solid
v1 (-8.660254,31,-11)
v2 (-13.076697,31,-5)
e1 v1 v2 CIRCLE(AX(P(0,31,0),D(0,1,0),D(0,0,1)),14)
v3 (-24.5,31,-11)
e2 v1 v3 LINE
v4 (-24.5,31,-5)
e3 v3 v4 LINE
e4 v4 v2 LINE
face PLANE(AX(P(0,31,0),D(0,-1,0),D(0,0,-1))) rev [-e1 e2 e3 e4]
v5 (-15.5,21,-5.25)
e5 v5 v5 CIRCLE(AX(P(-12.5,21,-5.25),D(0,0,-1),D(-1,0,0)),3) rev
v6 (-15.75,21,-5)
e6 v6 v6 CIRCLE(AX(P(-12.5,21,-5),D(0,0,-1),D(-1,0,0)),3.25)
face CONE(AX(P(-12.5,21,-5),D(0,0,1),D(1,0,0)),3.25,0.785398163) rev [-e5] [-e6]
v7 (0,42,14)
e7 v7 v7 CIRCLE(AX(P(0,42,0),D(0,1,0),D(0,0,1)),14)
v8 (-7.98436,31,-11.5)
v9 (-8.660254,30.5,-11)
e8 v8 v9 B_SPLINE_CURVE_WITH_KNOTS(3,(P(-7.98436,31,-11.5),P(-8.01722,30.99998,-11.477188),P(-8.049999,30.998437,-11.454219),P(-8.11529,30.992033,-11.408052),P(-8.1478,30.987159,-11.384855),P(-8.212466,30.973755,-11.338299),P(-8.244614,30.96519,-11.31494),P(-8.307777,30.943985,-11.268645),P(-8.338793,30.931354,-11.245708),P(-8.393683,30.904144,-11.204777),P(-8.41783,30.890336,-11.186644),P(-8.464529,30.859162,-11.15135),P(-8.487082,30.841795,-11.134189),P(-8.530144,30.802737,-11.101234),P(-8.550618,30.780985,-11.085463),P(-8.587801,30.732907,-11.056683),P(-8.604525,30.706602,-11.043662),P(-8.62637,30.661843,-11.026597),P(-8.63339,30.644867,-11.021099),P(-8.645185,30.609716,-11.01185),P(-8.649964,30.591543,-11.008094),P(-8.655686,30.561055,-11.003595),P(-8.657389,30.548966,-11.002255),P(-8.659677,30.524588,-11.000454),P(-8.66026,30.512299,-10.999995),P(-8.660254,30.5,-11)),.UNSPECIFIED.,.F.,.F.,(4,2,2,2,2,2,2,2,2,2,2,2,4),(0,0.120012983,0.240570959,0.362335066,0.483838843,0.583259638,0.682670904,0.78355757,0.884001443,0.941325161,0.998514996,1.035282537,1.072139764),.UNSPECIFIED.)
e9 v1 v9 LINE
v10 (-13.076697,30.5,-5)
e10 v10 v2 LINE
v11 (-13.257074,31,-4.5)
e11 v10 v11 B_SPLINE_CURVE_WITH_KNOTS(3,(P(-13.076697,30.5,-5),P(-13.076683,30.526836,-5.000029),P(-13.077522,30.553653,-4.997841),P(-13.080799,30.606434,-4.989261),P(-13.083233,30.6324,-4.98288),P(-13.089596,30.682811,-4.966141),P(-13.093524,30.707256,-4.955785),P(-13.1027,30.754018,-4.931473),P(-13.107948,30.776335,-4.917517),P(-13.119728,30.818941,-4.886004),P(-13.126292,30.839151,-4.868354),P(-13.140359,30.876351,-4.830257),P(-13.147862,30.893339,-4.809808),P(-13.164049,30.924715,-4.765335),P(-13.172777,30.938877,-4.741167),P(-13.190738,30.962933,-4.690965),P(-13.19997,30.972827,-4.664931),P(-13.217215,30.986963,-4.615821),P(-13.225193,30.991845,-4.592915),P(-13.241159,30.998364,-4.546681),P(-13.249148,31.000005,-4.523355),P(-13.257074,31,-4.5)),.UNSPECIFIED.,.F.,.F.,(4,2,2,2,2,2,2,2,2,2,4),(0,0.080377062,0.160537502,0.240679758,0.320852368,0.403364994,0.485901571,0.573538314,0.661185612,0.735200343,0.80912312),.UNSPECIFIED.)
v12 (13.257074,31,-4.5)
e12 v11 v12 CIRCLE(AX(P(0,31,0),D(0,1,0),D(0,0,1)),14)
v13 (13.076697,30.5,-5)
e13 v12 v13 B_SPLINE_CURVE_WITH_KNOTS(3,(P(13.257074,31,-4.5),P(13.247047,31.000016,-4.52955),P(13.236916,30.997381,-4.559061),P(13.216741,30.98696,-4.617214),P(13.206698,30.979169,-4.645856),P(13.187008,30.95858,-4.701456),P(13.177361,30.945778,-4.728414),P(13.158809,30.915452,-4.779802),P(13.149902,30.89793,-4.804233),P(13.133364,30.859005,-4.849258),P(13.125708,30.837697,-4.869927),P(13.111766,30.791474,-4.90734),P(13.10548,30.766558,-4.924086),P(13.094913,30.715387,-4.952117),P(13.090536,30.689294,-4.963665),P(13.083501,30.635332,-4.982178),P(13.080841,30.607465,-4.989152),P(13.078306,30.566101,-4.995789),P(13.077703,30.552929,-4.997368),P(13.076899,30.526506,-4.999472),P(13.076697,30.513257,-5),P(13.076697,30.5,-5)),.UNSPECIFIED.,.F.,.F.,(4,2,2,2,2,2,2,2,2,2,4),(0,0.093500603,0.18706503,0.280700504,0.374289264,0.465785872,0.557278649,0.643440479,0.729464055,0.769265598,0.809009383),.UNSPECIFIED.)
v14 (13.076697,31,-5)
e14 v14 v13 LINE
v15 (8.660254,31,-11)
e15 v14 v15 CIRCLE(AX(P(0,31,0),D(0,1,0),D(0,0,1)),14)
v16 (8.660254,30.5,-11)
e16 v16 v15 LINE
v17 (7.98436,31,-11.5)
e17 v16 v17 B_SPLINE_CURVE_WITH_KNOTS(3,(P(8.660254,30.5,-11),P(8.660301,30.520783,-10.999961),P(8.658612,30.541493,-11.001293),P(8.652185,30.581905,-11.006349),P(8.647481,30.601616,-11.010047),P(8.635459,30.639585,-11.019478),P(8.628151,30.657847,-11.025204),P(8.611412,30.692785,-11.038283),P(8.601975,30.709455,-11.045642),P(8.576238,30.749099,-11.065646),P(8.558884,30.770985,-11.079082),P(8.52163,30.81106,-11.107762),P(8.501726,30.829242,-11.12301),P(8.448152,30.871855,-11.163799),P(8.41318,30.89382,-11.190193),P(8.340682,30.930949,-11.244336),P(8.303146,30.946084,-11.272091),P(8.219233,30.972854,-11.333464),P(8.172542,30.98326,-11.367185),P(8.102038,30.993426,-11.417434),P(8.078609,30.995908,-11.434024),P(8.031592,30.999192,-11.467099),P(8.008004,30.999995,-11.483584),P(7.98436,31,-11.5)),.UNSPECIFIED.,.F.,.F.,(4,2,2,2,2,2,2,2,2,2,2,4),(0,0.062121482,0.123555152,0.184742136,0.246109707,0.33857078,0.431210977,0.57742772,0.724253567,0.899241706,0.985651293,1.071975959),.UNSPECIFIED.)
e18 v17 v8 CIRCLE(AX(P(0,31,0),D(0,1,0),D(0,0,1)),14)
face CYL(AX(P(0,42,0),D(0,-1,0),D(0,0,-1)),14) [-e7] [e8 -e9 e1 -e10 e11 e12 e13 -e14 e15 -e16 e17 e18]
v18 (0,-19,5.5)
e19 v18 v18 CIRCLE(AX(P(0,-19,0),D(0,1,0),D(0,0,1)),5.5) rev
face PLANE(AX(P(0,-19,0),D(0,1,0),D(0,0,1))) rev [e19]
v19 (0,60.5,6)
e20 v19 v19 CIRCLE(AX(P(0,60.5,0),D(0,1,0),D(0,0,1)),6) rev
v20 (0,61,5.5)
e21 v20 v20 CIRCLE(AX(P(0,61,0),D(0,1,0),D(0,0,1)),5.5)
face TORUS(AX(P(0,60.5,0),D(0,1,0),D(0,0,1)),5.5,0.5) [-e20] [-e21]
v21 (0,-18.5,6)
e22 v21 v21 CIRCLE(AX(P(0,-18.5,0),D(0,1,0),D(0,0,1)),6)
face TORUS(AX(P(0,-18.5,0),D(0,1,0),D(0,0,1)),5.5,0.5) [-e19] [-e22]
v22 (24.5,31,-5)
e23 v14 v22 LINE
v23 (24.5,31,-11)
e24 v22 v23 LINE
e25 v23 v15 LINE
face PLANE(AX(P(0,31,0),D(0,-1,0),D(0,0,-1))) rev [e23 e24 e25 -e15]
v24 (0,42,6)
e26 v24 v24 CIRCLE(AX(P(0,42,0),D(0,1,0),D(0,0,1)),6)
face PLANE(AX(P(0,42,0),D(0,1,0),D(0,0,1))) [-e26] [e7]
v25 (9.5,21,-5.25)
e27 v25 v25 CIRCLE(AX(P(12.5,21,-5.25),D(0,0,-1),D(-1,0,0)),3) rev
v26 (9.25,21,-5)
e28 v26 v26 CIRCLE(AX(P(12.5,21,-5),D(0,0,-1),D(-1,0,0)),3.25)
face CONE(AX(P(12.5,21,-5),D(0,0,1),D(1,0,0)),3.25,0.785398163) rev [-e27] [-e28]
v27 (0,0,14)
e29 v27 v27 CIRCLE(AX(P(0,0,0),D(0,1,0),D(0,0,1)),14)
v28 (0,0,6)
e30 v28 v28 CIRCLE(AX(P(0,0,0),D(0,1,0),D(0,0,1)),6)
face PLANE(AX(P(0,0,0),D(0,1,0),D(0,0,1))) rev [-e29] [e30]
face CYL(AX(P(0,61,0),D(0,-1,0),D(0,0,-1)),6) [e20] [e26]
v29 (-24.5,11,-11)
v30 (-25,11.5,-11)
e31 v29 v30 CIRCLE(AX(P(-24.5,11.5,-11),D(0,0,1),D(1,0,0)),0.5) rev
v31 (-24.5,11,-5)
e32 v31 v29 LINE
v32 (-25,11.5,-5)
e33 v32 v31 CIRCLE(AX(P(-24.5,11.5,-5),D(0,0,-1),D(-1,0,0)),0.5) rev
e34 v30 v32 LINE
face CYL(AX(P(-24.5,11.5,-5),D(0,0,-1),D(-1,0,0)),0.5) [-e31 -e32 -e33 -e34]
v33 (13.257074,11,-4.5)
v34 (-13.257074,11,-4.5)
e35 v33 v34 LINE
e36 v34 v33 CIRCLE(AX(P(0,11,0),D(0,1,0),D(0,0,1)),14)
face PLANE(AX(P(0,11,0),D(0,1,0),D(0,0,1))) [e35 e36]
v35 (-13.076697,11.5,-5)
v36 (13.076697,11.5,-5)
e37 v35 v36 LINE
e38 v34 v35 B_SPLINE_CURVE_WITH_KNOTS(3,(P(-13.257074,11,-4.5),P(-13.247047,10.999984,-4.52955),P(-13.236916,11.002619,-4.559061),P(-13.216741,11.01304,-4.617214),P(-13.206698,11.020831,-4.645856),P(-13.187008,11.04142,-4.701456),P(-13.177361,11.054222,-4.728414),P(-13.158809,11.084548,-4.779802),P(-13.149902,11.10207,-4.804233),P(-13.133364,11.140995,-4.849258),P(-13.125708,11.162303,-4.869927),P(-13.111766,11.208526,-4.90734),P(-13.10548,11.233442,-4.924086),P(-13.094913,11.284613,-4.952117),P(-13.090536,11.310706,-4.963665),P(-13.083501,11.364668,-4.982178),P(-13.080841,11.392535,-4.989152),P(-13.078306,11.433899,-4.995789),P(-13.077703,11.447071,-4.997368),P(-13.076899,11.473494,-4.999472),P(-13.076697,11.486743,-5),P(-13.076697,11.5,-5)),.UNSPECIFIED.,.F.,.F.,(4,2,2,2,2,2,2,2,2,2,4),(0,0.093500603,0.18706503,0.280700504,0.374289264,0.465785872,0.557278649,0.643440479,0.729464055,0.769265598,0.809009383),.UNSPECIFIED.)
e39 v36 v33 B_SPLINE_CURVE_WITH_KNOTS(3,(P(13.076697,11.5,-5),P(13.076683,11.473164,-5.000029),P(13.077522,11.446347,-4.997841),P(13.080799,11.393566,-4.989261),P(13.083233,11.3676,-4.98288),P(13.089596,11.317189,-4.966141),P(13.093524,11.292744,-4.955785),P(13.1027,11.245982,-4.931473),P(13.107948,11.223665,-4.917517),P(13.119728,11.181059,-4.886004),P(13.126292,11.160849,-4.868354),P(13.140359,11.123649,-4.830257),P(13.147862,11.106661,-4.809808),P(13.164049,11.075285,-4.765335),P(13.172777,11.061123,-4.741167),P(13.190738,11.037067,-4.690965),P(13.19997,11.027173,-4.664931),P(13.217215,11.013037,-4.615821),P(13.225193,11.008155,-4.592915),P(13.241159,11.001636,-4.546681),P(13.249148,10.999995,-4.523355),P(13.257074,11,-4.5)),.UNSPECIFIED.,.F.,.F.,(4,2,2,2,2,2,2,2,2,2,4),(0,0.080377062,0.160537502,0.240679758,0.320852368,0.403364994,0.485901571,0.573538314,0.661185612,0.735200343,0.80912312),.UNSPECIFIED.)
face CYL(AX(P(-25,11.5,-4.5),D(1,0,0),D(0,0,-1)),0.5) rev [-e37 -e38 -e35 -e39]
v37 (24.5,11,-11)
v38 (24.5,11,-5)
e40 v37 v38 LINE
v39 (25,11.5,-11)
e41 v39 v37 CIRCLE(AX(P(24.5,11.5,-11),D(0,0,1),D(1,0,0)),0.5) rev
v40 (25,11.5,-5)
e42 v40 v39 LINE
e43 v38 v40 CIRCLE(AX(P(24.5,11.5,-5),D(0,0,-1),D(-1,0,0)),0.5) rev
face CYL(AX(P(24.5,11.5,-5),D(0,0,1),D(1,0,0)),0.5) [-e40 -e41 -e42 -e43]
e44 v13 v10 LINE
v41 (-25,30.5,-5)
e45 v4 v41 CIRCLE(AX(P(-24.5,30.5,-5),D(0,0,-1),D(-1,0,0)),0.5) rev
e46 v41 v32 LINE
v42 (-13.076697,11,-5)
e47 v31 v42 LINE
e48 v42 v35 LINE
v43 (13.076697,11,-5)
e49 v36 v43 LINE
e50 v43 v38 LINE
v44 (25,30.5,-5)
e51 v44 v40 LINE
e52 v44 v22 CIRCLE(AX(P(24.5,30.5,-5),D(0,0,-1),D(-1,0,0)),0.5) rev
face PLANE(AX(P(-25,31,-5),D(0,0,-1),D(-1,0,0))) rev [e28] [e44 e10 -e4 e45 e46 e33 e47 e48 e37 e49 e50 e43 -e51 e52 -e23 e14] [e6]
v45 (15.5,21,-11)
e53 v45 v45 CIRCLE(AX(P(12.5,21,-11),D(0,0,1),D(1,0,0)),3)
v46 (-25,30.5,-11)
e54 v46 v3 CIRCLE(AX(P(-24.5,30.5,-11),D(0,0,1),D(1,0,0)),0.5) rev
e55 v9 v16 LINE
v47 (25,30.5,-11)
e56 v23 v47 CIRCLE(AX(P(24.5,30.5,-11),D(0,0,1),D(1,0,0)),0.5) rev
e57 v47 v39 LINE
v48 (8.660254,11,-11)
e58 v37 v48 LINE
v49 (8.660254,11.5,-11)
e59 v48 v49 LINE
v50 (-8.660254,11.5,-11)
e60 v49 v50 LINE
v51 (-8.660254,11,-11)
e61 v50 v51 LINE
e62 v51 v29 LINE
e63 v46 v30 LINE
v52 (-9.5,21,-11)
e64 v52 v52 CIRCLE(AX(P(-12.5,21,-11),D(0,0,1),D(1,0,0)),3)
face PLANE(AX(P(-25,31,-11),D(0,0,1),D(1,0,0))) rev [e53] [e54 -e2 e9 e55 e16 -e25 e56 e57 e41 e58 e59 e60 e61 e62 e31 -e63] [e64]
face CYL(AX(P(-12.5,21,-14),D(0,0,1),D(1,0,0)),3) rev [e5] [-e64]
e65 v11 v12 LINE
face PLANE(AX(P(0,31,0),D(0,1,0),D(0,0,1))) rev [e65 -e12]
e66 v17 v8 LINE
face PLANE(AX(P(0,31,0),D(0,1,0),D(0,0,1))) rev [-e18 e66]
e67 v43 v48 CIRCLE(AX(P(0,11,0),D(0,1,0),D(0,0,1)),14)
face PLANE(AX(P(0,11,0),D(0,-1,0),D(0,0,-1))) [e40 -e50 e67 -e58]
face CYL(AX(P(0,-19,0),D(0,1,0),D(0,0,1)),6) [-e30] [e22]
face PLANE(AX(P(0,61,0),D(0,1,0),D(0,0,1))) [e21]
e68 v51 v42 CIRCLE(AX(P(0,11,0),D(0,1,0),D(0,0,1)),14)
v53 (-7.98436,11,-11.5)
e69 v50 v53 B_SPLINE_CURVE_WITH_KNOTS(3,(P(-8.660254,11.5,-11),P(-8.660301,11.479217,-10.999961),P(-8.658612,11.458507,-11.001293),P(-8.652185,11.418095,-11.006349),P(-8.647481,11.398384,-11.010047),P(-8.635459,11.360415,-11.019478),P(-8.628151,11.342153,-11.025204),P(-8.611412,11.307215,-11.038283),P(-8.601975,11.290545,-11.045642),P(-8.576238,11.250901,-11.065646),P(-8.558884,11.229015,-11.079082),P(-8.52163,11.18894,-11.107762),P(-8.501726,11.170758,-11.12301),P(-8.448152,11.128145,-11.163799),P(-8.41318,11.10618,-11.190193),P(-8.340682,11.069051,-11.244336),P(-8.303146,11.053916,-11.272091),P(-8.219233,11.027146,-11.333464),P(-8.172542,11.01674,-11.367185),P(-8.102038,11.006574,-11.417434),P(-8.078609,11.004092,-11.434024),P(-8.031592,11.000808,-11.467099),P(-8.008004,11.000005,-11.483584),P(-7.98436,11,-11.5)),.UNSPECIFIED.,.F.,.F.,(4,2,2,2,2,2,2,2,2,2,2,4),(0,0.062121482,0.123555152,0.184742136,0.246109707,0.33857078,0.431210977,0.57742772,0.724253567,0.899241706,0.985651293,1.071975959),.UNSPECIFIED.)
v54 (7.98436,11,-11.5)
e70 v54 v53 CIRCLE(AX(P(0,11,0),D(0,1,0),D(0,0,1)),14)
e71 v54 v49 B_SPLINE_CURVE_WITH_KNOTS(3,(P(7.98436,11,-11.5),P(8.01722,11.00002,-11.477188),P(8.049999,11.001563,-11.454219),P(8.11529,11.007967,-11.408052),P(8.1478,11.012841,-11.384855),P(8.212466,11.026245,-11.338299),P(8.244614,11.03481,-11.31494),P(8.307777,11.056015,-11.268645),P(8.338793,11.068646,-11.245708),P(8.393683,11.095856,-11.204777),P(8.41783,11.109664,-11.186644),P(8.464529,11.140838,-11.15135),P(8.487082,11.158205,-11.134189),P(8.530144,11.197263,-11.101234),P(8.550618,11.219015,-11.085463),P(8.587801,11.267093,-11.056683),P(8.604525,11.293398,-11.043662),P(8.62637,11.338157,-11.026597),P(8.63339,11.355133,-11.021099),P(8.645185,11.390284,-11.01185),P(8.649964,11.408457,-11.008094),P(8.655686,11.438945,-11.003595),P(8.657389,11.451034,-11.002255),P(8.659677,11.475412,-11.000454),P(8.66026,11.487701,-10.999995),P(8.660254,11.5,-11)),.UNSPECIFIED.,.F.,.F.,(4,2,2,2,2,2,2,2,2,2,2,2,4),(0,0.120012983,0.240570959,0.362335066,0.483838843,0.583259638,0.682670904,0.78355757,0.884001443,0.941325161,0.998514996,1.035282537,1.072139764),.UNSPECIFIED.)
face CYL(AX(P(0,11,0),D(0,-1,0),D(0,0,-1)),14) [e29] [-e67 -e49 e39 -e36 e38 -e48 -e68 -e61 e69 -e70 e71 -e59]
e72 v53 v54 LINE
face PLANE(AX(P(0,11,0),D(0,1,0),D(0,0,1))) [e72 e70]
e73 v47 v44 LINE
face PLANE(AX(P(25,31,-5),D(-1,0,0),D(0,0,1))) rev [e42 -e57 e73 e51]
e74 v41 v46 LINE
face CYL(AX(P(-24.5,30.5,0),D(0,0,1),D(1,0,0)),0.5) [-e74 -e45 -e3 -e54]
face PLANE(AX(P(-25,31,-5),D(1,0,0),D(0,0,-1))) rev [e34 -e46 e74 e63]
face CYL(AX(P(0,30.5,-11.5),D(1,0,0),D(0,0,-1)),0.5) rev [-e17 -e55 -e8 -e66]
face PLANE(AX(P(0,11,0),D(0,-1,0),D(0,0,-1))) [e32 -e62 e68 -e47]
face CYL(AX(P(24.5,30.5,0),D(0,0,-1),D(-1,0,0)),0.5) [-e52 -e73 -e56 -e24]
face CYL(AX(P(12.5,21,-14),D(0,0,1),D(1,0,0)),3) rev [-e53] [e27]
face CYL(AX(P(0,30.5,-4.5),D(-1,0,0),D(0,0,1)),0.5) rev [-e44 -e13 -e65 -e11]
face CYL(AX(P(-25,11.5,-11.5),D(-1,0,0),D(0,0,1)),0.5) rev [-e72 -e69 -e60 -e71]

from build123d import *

# Parameters (mm, degrees)
CROQUIS1_R                 = 6
SALIENTE_EXTRUIR1_DEPTH    = 19
CROQUIS2_R                 = 14
SALIENTE_EXTRUIR2_DEPTH    = 11
CROQUIS5_W                 = 50
CROQUIS5_H                 = 6
SALIENTE_EXTRUIR6_DEPTH    = 20
CROQUIS6_R                 = 14
SALIENTE_EXTRUIR7_DEPTH    = 11
SALIENTE_EXTRUIR8_START    = 19
CROQUIS7_R                 = 6
SALIENTE_EXTRUIR8_DEPTH    = 19
CORTAR_EXTRUIR2_DEPTH      = 69.607579756
CORTAR_EXTRUIR2_DEPTH_BACK = 69.607579756
CROQUIS9_R                 = 3
REDONDEO2_R                = 0.5
CHAFL_N1_SIZE              = 0.25


with BuildPart() as part:
    # Croquis1 → Saliente-Extruir1 (new body)
    with BuildSketch(Plane(origin=(0, 0, 0), x_dir=(1, 0, 0), z_dir=(0, 1, 0))):
        with Locations(Location((0, 0, 0), (0, 0, 270))):
            Circle(CROQUIS1_R)
    extrude(amount=-SALIENTE_EXTRUIR1_DEPTH)

    # Croquis2 → Saliente-Extruir2 (add)
    with BuildSketch(Plane(origin=(0, 0, 0), x_dir=(1, 0, 0), z_dir=(0, 1, 0))):
        with Locations(Location((0, 0, 0), (0, 0, 270))):
            Circle(CROQUIS2_R)
    extrude(amount=SALIENTE_EXTRUIR2_DEPTH)

    # Croquis5 → Saliente-Extruir6 (add)
    with BuildSketch(Plane(origin=(0, 11, 0), x_dir=(1, 0, 0), z_dir=(0, 1, 0))):
        with Locations((0, 8)):
            Rectangle(CROQUIS5_W, CROQUIS5_H)
    extrude(amount=SALIENTE_EXTRUIR6_DEPTH)

    # Croquis6 → Saliente-Extruir7 (add)
    with BuildSketch(Plane(origin=(0, 31, 0), x_dir=(1, 0, 0), z_dir=(0, 1, 0))):
        with Locations(Location((0, 0, 0), (0, 0, 128.213210702))):
            Circle(CROQUIS6_R)
    extrude(amount=SALIENTE_EXTRUIR7_DEPTH)

    # Croquis7 → Saliente-Extruir8 (add)
    with BuildSketch(Plane(origin=(0, 42, 0), x_dir=(1, 0, 0), z_dir=(0, 1, 0)).offset(SALIENTE_EXTRUIR8_START)):
        with Locations(Location((0, 0, 0), (0, 0, 270))):
            Circle(CROQUIS7_R)
    extrude(amount=-SALIENTE_EXTRUIR8_DEPTH)

    # Croquis9 → Cortar-Extruir2 (cut, two sides: drawn at the far end of the back side and taken through both)
    with BuildSketch(Plane.XY.offset(-5).offset(-CORTAR_EXTRUIR2_DEPTH_BACK)):
        with Locations((-12.5, 21)):
            Circle(CROQUIS9_R)
        with Locations((12.5, 21)):
            Circle(CROQUIS9_R)
    extrude(amount=CORTAR_EXTRUIR2_DEPTH + CORTAR_EXTRUIR2_DEPTH_BACK, mode=Mode.SUBTRACT)

    # Redondeo2
    # the kernel refuses this fillet: 0.5 mm, written as the material it adds along each edge
    with BuildSketch(Plane(origin=(9.910254038, 11, -11), x_dir=(0, 0, -1), z_dir=(-1, 0, 0))) as redondeo2_piece_1_section:
        with BuildLine():
            CenterArc((REDONDEO2_R, -REDONDEO2_R), REDONDEO2_R, 90, 90)
            Line((0, -REDONDEO2_R), (0, 0))
            Line((0, 0), (REDONDEO2_R, 0))
        make_face()
    redondeo2_piece_1 = extrude(amount=19.820508076, mode=Mode.PRIVATE)
    redondeo2_piece_1 = redondeo2_piece_1 & Plane(origin=(0, 11.11248229, 0), x_dir=(0, 0, 1), z_dir=(0, -1, 0)) * Cylinder(14, 42, mode=Mode.PRIVATE)
    add(redondeo2_piece_1)
    with BuildSketch(Plane(origin=(-14.326696831, 11, -5), x_dir=(0, 0, 1), z_dir=(1, 0, 0))) as redondeo2_piece_2_section:
        with BuildLine():
            CenterArc((REDONDEO2_R, -REDONDEO2_R), REDONDEO2_R, 90, 90)
            Line((0, -REDONDEO2_R), (0, 0))
            Line((0, 0), (REDONDEO2_R, 0))
        make_face()
    redondeo2_piece_2 = extrude(amount=28.653393661, mode=Mode.PRIVATE)
    redondeo2_piece_2 = redondeo2_piece_2 & Plane(origin=(0, 11.111538065, 0), x_dir=(0, 0, 1), z_dir=(0, -1, 0)) * Cylinder(14, 60, mode=Mode.PRIVATE)
    add(redondeo2_piece_2)
    with BuildSketch(Plane(origin=(-14.326696831, 31, -5), x_dir=(0, -1, 0), z_dir=(1, 0, 0))) as redondeo2_piece_3_section:
        with BuildLine():
            CenterArc((REDONDEO2_R, -REDONDEO2_R), REDONDEO2_R, 90, 90)
            Line((0, -REDONDEO2_R), (0, 0))
            Line((0, 0), (REDONDEO2_R, 0))
        make_face()
    redondeo2_piece_3 = extrude(amount=28.653393661, mode=Mode.PRIVATE)
    redondeo2_piece_3 = redondeo2_piece_3 & Plane(origin=(0, 30.888461941, 0), x_dir=(-0.6185895741353322, 0, -0.7857142857114591), z_dir=(0, -1, 0)) * Cylinder(14, 60, mode=Mode.PRIVATE)
    add(redondeo2_piece_3)
    with BuildSketch(Plane(origin=(9.910254038, 31, -11), x_dir=(0, -1, 0), z_dir=(-1, 0, 0))) as redondeo2_piece_4_section:
        with BuildLine():
            CenterArc((REDONDEO2_R, -REDONDEO2_R), REDONDEO2_R, 90, 90)
            Line((0, -REDONDEO2_R), (0, 0))
            Line((0, 0), (REDONDEO2_R, 0))
        make_face()
    redondeo2_piece_4 = extrude(amount=19.820508076, mode=Mode.PRIVATE)
    redondeo2_piece_4 = redondeo2_piece_4 & Plane(origin=(0, 30.887517705, 0), x_dir=(-0.6185895741353322, 0, -0.7857142857114591), z_dir=(0, -1, 0)) * Cylinder(14, 42, mode=Mode.PRIVATE)
    add(redondeo2_piece_4)
    # the kernel refuses this fillet: 0.5 mm, written as the material it takes off along each edge
    with BuildSketch(Plane(origin=(0, -19, 0), x_dir=(0, 0, 1), z_dir=(-1, 0, 0))) as redondeo2_2_piece_1:
        with BuildLine():
            CenterArc((6 - REDONDEO2_R, REDONDEO2_R), REDONDEO2_R, 270, 90)
            Line((6 - REDONDEO2_R, 0), (6, 0))
            Line((6, 0), (6, REDONDEO2_R))
        make_face()
    revolve(axis=Axis((0, -19, 0), (0, 1, 0)), mode=Mode.SUBTRACT)
    with BuildSketch(Plane(origin=(0, 61, 0), x_dir=(0, 0, 1), z_dir=(-1, 0, 0))) as redondeo2_2_piece_2:
        with BuildLine():
            CenterArc((6 - REDONDEO2_R, -REDONDEO2_R), REDONDEO2_R, 0, 90)
            Line((6 - REDONDEO2_R, 0), (6, 0))
            Line((6, 0), (6, -REDONDEO2_R))
        make_face()
    revolve(axis=Axis((0, 61, 0), (0, 1, 0)), mode=Mode.SUBTRACT)
    with BuildSketch(Plane(origin=(25, 11, -3.75), x_dir=(-1, 0, 0), z_dir=(0, 0, -1)), Plane(origin=(25, 31, -3.75), x_dir=(0, -1, 0), z_dir=(0, 0, -1)), Plane(origin=(-25, 11, -12.25), x_dir=(1, 0, 0), z_dir=(0, 0, 1)), Plane(origin=(-25, 31, -12.25), x_dir=(0, -1, 0), z_dir=(0, 0, 1))) as redondeo2_2_piece_3:
        with BuildLine():
            CenterArc((REDONDEO2_R, REDONDEO2_R), REDONDEO2_R, 180, 90)
            Line((0, REDONDEO2_R), (0, 0))
            Line((0, 0), (REDONDEO2_R, 0))
        make_face()
    extrude(amount=8.5, mode=Mode.SUBTRACT)

    # Chaflán1
    chafl_n1_edges = [part.edges().sort_by_distance(p)[0] for p in [
        (-15.5, 21, -5),
        (9.5, 21, -5),
    ]]
    chamfer(chafl_n1_edges, length=CHAFL_N1_SIZE)


solid = part.part
